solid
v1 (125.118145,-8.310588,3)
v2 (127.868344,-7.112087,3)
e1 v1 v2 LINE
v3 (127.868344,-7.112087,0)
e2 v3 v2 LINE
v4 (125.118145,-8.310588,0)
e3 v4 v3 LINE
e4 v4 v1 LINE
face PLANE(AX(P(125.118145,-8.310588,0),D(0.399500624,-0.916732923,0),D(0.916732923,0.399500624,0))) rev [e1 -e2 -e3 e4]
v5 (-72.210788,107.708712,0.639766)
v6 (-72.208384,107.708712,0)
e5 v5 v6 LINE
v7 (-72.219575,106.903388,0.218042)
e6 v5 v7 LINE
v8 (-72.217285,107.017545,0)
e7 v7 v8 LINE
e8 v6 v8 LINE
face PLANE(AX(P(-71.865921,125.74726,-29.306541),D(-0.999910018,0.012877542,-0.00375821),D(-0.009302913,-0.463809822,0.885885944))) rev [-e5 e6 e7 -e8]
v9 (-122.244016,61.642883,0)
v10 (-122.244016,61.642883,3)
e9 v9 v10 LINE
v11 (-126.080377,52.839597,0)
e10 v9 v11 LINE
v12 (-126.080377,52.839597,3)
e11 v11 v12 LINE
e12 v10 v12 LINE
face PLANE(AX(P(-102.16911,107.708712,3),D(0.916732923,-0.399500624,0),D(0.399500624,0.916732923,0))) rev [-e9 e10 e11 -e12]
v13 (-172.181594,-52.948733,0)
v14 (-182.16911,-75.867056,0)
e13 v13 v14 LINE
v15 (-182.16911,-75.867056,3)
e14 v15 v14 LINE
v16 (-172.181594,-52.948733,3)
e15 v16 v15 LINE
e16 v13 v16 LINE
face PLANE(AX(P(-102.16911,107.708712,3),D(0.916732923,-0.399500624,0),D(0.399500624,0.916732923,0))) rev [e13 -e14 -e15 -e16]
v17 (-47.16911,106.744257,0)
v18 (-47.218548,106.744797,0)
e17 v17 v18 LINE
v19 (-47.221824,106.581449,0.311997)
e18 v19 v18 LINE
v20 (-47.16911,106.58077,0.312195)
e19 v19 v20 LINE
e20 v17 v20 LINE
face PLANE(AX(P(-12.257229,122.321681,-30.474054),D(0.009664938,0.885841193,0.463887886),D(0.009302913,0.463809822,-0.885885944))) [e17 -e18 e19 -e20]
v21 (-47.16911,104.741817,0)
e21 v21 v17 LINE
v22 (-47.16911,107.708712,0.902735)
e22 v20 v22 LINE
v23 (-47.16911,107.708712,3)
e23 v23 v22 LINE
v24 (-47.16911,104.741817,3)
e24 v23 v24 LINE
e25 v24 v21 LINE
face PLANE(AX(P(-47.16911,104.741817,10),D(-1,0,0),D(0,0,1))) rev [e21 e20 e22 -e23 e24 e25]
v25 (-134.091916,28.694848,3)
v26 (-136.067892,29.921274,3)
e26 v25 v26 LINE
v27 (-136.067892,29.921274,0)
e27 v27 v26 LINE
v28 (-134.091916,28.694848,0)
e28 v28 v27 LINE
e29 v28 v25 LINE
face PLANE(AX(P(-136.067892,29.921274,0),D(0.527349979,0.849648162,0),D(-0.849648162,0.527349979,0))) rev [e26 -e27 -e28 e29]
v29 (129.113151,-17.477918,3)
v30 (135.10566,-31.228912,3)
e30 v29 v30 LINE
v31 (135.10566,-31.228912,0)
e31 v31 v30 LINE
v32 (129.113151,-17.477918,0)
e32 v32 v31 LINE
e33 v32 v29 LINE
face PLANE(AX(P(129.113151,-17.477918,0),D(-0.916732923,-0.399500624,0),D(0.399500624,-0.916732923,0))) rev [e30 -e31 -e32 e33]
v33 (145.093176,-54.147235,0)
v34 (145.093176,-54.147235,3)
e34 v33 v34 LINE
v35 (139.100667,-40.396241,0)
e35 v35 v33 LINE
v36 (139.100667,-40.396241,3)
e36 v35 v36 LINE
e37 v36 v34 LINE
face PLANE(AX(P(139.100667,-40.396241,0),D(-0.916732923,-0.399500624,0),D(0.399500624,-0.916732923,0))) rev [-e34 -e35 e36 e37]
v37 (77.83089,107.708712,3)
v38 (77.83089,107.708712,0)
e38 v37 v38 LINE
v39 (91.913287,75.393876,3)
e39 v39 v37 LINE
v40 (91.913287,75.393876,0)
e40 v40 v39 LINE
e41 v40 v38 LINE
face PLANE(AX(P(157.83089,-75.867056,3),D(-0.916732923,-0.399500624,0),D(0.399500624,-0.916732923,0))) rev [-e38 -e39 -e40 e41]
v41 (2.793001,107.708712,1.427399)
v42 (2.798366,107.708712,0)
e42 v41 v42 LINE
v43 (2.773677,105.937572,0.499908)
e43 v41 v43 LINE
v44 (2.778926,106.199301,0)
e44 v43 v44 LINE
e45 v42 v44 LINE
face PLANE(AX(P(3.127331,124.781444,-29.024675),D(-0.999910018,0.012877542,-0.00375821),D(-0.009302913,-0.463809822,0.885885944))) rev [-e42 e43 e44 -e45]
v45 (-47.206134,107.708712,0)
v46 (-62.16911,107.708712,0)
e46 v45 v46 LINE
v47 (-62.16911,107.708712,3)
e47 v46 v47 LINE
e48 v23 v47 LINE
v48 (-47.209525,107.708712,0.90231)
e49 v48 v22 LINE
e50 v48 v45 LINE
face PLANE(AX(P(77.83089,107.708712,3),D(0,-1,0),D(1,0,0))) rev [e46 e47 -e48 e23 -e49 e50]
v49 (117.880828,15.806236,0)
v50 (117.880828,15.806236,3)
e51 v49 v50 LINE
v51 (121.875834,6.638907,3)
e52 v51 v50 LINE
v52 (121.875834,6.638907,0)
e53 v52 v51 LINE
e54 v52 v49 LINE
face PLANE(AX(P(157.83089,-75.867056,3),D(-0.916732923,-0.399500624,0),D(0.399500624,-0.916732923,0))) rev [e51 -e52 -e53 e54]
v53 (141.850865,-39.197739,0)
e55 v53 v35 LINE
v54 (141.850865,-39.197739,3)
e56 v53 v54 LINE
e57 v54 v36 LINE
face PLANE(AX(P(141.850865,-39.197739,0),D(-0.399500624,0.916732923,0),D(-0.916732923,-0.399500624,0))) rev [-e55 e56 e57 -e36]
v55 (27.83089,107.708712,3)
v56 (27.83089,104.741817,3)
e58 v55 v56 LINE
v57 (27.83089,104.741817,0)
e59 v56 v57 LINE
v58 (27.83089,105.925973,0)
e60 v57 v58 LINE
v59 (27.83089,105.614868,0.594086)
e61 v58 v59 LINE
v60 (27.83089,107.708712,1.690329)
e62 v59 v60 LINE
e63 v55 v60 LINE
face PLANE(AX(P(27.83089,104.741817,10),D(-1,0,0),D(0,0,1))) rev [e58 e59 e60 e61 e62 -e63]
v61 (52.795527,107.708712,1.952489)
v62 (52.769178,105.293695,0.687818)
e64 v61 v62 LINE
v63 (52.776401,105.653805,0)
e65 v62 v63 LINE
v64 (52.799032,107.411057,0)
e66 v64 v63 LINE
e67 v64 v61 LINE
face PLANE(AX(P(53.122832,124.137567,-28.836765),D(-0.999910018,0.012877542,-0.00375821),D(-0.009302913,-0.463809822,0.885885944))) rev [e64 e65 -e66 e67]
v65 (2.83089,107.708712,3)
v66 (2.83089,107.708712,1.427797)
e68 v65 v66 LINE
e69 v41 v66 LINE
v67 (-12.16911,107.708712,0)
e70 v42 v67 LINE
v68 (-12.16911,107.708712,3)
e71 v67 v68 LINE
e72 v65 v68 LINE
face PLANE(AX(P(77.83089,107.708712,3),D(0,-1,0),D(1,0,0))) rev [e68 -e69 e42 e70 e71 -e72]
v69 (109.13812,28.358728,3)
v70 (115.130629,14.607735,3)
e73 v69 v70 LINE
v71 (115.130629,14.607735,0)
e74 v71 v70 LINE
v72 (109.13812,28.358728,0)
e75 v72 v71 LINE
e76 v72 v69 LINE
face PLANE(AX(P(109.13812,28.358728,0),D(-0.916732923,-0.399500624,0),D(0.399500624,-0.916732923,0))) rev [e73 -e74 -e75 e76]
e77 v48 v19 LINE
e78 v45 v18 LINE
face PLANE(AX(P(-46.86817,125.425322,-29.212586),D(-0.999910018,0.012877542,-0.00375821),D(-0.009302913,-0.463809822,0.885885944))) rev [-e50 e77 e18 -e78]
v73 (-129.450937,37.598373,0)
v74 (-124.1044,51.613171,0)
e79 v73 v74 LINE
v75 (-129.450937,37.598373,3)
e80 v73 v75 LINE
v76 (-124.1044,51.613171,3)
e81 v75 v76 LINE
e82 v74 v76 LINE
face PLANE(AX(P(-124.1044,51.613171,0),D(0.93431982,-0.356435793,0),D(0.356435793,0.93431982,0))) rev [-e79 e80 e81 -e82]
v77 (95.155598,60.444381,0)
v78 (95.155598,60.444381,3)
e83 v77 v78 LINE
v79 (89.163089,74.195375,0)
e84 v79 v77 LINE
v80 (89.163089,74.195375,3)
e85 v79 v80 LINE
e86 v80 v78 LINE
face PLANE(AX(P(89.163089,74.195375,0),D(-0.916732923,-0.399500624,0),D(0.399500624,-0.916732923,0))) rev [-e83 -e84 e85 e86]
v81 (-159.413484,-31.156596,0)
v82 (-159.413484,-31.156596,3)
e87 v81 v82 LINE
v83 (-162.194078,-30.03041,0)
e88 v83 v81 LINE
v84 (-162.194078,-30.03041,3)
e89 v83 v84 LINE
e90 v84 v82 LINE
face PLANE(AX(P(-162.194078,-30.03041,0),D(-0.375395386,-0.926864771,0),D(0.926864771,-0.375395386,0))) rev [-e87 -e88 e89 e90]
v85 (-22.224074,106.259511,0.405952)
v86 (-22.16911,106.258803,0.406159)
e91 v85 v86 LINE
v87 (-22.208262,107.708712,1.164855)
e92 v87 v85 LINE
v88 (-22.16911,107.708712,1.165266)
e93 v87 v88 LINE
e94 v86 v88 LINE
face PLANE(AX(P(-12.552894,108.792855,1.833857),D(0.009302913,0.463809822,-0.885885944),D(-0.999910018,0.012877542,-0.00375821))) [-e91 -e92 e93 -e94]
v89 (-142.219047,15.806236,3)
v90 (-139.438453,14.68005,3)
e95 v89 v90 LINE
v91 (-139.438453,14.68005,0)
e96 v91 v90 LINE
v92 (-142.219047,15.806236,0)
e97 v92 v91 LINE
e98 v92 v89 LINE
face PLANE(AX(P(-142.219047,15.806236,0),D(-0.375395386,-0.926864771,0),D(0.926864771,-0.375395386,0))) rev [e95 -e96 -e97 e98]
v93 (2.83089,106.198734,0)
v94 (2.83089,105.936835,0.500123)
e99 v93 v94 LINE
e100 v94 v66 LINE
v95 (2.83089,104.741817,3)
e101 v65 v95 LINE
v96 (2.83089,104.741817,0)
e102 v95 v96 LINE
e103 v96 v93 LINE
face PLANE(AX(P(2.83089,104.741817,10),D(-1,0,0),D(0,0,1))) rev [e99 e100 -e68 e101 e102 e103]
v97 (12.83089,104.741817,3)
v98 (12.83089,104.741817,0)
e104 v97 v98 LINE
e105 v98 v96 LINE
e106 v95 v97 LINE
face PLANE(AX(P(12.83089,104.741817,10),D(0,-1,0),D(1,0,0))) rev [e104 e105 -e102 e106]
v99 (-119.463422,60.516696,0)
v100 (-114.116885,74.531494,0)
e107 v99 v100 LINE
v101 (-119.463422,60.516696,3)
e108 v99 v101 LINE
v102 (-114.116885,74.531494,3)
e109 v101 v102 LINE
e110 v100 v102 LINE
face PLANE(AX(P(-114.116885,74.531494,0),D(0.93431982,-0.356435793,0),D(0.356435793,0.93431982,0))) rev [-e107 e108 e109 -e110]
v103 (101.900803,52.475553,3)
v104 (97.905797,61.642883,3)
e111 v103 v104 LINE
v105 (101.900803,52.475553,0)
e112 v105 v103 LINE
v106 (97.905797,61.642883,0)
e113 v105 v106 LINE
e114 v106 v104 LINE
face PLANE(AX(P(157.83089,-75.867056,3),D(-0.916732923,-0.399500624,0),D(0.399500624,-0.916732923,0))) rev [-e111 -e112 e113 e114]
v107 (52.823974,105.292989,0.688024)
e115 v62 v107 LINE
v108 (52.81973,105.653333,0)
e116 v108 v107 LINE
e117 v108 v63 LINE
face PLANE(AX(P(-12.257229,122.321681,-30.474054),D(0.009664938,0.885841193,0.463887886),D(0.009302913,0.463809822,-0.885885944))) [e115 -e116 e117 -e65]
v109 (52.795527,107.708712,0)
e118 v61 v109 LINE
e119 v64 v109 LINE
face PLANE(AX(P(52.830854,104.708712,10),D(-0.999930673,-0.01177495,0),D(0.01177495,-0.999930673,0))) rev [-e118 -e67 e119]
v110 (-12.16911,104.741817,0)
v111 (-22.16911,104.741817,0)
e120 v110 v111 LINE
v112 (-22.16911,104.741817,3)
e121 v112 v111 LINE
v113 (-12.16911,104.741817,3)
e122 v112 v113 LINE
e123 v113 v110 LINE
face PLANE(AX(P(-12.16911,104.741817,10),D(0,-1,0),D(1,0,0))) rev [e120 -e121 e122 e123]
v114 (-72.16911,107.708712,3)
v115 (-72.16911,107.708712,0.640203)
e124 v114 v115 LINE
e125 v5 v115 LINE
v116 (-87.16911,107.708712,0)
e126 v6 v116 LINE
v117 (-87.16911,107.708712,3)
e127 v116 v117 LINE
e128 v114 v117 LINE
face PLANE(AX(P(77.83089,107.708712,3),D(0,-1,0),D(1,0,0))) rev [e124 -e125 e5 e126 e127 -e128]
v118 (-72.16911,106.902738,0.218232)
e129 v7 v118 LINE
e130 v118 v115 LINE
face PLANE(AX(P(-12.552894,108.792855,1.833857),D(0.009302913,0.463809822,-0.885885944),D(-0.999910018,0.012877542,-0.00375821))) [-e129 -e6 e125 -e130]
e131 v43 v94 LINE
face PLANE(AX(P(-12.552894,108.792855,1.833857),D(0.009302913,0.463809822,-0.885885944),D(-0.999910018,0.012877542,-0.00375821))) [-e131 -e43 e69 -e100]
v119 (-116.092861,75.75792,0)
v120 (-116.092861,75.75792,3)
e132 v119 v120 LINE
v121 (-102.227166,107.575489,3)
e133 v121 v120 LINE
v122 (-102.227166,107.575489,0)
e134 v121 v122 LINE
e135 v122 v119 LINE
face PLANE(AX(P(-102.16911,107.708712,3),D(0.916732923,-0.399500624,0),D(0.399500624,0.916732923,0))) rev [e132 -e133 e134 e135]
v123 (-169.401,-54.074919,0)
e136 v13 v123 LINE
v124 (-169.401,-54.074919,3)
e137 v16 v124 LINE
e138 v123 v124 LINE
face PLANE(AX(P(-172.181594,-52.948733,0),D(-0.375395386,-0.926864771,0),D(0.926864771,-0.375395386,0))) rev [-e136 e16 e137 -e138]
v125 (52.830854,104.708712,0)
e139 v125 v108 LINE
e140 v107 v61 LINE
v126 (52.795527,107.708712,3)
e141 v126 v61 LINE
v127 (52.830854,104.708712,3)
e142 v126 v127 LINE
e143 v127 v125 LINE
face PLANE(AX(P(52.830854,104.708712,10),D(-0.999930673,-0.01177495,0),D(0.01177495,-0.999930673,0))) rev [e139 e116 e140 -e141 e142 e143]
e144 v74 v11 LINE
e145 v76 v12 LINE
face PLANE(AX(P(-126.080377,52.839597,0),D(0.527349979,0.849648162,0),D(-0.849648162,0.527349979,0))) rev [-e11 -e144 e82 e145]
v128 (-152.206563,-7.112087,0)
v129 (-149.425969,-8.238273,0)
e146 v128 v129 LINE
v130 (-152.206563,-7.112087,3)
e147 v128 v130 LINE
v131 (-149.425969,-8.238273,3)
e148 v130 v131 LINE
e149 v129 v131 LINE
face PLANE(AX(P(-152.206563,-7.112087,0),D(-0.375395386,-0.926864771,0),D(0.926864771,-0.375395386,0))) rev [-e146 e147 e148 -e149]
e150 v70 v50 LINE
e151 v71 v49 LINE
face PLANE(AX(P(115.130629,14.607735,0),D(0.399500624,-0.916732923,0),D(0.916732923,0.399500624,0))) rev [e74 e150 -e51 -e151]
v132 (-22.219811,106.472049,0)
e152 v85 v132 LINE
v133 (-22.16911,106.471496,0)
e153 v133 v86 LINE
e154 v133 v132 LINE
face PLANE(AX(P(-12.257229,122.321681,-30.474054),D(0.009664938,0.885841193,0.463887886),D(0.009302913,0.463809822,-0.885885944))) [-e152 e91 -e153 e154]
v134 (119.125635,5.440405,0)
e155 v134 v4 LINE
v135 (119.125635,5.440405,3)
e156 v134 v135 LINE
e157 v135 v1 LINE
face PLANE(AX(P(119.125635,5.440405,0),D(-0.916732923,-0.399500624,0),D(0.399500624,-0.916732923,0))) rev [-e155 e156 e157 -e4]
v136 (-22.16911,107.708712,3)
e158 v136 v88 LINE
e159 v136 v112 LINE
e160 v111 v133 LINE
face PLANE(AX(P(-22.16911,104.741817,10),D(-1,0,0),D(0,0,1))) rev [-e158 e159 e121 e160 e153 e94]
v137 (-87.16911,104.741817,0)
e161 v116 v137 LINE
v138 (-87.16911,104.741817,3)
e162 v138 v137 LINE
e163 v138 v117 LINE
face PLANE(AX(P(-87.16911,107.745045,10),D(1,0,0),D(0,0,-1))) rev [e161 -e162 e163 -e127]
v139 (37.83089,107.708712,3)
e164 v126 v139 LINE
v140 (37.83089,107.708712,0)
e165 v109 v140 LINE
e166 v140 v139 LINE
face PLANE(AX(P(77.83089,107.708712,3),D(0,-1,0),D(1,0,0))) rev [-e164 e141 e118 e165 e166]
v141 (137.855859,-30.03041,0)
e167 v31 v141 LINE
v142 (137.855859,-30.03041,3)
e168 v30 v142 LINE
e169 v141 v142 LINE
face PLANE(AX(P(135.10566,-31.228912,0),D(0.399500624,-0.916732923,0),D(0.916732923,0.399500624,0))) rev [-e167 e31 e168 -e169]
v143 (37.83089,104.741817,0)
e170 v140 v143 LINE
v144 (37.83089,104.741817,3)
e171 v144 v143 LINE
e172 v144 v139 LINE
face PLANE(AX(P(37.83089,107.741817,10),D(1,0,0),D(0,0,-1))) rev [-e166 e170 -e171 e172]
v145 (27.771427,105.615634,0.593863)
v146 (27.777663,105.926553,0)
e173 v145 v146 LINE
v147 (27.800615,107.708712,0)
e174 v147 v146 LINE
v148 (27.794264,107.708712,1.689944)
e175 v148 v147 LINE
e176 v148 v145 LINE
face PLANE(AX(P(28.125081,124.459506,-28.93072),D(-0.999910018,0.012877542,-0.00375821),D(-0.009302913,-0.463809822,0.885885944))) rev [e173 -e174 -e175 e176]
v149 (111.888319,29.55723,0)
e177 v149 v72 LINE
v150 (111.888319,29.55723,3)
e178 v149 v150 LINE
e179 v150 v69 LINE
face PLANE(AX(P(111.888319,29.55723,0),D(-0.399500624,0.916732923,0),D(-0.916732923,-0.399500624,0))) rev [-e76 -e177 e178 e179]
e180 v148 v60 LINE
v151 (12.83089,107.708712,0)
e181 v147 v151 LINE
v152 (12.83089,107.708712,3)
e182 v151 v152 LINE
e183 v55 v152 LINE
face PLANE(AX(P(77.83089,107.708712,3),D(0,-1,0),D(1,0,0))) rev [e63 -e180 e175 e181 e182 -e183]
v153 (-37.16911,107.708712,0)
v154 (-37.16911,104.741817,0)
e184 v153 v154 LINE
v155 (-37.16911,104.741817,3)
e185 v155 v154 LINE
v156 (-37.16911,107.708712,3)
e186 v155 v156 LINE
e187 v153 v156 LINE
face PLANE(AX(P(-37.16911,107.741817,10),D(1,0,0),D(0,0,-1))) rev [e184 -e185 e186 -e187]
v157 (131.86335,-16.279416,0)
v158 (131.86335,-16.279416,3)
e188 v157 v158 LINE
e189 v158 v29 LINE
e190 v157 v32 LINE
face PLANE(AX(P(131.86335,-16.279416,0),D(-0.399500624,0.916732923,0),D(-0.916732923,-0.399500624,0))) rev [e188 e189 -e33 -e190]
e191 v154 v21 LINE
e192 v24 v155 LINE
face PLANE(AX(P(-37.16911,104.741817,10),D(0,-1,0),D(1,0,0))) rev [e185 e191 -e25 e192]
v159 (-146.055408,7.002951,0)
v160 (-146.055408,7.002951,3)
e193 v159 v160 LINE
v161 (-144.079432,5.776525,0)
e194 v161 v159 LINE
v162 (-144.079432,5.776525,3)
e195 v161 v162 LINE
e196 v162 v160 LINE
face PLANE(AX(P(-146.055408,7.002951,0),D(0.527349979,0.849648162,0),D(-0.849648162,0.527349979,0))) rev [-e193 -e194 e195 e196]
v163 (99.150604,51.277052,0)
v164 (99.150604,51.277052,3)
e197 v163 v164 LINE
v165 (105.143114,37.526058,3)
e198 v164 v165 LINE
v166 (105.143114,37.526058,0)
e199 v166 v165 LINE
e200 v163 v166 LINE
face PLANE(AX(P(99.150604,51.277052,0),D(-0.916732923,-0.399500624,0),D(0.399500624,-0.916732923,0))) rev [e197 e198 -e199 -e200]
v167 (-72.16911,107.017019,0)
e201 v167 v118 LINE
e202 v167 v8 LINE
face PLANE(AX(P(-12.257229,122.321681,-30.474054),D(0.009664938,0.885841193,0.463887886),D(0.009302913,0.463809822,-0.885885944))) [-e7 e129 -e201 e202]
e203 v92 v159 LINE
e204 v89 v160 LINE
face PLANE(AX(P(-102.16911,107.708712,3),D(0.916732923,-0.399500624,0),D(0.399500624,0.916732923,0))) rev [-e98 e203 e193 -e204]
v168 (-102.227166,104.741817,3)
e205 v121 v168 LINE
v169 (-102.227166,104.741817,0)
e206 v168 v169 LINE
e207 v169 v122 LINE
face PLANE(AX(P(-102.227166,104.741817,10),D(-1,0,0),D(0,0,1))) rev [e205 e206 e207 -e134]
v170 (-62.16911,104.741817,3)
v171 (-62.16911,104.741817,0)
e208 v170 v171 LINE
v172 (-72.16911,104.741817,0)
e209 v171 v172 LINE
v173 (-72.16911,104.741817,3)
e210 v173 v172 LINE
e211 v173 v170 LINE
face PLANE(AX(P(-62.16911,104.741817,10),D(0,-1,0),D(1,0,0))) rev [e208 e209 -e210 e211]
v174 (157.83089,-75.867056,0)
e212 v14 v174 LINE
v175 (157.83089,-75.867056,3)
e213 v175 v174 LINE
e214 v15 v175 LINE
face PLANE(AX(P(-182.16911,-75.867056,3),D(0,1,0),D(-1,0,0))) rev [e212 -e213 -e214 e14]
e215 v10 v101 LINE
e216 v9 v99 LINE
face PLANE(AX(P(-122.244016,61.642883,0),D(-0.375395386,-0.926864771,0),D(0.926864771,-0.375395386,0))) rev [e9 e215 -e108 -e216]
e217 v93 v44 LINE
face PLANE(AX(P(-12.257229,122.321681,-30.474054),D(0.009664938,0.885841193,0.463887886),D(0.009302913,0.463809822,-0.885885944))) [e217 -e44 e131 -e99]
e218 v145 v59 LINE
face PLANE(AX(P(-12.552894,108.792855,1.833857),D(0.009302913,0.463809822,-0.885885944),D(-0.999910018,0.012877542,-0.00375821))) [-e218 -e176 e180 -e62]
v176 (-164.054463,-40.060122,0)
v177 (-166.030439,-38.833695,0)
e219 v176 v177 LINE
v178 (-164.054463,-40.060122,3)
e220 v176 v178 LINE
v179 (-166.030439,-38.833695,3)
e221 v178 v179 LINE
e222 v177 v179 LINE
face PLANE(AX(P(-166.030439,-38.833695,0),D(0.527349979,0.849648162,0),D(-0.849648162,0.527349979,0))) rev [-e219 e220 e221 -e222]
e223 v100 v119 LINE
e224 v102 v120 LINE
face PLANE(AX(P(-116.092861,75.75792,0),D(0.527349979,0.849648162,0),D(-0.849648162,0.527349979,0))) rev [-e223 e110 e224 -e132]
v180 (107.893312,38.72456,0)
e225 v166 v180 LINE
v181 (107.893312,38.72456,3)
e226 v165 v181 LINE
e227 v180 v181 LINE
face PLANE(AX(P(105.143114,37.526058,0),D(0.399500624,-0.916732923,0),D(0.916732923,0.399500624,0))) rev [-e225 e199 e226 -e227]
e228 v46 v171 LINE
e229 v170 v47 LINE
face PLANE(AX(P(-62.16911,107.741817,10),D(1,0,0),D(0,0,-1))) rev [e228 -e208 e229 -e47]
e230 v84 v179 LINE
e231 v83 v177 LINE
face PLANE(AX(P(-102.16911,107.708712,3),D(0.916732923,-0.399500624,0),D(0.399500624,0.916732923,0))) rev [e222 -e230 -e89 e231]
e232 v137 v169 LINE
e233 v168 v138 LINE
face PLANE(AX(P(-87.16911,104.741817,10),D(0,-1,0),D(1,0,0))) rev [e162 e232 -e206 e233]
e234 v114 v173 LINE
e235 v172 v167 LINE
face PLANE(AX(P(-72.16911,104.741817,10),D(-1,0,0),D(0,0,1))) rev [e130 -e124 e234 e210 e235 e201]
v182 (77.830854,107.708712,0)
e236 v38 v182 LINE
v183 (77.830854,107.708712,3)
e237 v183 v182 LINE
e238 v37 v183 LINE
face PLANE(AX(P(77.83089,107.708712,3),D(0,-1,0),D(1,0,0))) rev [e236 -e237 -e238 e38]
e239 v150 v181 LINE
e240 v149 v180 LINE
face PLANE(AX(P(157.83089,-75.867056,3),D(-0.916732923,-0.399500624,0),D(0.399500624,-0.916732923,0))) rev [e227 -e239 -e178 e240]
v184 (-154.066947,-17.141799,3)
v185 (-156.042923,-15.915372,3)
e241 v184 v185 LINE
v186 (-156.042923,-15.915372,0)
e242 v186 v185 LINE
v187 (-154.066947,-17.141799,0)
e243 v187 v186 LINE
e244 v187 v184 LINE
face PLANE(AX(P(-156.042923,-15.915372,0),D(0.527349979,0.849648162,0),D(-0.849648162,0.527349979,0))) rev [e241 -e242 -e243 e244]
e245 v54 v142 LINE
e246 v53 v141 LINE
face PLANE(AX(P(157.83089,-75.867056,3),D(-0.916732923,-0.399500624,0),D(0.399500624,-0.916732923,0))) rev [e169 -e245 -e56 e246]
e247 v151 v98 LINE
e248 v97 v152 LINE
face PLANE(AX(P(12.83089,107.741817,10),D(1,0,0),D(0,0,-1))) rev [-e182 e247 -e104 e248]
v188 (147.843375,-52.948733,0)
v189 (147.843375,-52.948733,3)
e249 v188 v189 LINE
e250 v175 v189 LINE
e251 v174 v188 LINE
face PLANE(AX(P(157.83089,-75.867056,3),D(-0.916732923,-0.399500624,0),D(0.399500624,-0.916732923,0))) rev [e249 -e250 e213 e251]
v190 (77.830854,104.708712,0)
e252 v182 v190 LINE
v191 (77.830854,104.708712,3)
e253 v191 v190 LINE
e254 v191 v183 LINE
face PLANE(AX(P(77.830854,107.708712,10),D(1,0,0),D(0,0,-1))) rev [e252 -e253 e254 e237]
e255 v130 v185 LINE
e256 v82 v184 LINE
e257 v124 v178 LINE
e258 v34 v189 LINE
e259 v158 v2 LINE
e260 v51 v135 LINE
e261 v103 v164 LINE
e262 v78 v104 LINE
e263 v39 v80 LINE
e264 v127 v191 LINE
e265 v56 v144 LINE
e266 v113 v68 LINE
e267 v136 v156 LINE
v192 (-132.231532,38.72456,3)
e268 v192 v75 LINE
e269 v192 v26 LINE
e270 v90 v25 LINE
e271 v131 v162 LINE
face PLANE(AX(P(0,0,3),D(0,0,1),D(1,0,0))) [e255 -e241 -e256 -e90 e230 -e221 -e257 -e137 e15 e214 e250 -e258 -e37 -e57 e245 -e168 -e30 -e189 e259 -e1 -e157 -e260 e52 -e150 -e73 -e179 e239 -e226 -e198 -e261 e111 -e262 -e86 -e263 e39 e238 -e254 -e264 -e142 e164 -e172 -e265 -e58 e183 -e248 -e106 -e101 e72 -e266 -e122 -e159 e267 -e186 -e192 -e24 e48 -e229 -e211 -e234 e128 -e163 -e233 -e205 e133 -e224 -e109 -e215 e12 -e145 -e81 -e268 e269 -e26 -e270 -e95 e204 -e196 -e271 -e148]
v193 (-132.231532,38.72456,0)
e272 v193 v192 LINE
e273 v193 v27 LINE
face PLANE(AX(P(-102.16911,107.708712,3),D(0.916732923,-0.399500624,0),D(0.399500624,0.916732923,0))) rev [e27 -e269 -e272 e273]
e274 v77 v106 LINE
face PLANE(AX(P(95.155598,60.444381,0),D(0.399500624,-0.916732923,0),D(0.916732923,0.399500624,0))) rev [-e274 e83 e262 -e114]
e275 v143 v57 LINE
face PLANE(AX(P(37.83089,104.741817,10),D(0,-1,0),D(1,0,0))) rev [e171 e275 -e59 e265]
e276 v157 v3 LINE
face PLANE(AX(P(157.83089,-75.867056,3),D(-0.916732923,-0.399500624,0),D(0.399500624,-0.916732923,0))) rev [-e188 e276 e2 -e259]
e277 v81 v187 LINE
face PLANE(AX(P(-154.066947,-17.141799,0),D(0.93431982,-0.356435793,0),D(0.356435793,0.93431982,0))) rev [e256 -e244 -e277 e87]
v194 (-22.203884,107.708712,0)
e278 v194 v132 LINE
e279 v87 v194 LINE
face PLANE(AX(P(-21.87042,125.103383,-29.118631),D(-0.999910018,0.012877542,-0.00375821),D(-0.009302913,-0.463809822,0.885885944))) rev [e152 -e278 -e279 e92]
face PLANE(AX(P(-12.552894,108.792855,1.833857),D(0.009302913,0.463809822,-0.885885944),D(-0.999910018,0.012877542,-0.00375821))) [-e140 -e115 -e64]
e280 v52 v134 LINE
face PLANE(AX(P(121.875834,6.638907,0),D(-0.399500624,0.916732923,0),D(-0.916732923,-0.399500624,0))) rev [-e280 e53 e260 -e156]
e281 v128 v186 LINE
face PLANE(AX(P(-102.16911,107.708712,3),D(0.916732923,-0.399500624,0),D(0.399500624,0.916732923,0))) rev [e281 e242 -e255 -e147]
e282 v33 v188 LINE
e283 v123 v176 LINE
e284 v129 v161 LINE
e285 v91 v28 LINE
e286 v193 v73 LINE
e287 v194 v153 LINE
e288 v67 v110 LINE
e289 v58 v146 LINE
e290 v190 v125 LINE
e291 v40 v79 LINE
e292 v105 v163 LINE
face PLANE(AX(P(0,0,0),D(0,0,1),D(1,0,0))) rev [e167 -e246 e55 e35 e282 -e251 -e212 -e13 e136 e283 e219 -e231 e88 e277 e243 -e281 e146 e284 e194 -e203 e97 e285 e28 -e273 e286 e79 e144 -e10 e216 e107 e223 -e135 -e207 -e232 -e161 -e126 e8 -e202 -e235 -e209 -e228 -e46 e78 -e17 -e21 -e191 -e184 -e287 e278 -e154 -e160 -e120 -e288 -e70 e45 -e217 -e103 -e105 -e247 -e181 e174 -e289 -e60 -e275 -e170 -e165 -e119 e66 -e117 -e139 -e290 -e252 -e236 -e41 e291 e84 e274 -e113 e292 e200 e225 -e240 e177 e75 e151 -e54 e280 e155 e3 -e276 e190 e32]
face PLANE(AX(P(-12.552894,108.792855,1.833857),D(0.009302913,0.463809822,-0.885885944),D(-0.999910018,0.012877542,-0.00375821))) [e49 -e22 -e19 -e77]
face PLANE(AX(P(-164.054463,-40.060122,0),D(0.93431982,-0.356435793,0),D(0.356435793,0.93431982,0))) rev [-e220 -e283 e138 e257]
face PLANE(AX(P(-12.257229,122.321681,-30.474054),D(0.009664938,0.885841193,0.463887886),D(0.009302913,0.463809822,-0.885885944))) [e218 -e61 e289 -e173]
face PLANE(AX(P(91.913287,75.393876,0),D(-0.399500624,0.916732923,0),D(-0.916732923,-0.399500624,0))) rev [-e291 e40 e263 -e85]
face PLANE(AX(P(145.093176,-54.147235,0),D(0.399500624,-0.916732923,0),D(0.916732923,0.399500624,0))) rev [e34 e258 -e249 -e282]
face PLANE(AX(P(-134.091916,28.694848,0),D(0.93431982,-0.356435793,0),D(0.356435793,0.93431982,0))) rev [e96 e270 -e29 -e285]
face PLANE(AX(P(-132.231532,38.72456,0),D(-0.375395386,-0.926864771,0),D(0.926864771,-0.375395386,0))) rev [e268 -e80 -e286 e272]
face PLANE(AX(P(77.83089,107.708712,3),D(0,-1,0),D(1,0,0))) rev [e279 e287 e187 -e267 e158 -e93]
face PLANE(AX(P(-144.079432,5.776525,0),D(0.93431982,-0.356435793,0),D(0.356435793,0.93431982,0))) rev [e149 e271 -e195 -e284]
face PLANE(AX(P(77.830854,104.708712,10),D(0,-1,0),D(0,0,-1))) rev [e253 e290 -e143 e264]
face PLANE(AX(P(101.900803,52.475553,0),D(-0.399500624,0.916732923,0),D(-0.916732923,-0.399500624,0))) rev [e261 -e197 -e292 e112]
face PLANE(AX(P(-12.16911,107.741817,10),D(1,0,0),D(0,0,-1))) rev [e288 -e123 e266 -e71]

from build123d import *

# Parameters (mm, degrees)
BOSS_EXTRUDE1_DEPTH = 3
CUT_EXTRUDE2_DEPTH  = 3
LPATTERN2_COUNT     = 6
LPATTERN2_PITCH     = 25
CUT_EXTRUDE3_DEPTH  = 3
LPATTERN3_COUNT     = 6
LPATTERN3_PITCH     = 25
CAVITY4_START       = 94.102573719
CAVITY4_DEPTH       = 3
SKETCH4_W           = 10
SKETCH4_H           = 3
SKETCH4_W_2         = 15.058056796
SKETCH4_H_2         = 3.003228899
CUT_EXTRUDE5_DEPTH  = 10


# Read off the part's stored shape, not the designer's step: Cavity4
with BuildPart() as part:
    # Sketch1 → Boss-Extrude1 (new body)
    with BuildSketch(Plane.XY):
        Polygon((-182.169109633, -75.86705578), (157.830890367, -75.86705578), (77.830890367, 107.708711956), (-102.169109633, 107.708711956), align=None)
    extrude(amount=BOSS_EXTRUDE1_DEPTH)

    # Sketch2 → Cut-Extrude2 (cut)
    with BuildSketch(Plane.XY.offset(3)):
        Polygon((-172.181594028, -52.948732717), (-169.400999714, -54.074918874), (-164.054462817, -40.06012158), (-166.030438991, -38.833695112), align=None)
    cut_extrude2 = extrude(amount=-CUT_EXTRUDE2_DEPTH, mode=Mode.SUBTRACT)

    # LPattern2: Cut-Extrude2 ×6
    with Locations(*[Vector(0.3995006242197252, 0.916732922528721, 0) * (i * LPATTERN2_PITCH) for i in range(1, LPATTERN2_COUNT)]):
        add(cut_extrude2, mode=Mode.SUBTRACT)

    # Sketch3 → Cut-Extrude3 (cut)
    with BuildSketch(Plane.XY.offset(3)):
        Polygon((147.843374761, -52.948732717), (141.850865398, -39.197738879), (139.10066663, -40.396240752), (145.093175994, -54.14723459), align=None)
    cut_extrude3 = extrude(amount=-CUT_EXTRUDE3_DEPTH, mode=Mode.SUBTRACT)

    # LPattern3: Cut-Extrude3 ×6
    with Locations(*[Vector(-0.3995006242197251, 0.9167329225287211, 0) * (i * LPATTERN3_PITCH) for i in range(1, LPATTERN3_COUNT)]):
        add(cut_extrude3, mode=Mode.SUBTRACT)

    # Cavity4 outline → Cavity4 (cut)
    with BuildSketch(Plane(origin=(0, 0, 0), x_dir=(0.9999532933915303, -0.008562000513036364, -0.004483657284732639), z_dir=(0.009664938459823271, 0.8858411925353571, 0.46388788577856205)).offset(CAVITY4_START)):
        Polygon((-103.131187753, 49.679443772), (-88.131836909, 49.53989356), (-88.127862283, 49.967100463), (-88.118252444, 51), (-103.118901627, 51), (-103.12893984, 49.921057402), align=None)
        Polygon((-63.117170469, 51), (-73.117603258, 51), (-73.127213098, 49.967100463), (-73.132486065, 49.400343349), (-63.132918836, 49.307309875), (-63.126780309, 49.967100463), align=None)
        Polygon((-38.116088496, 51), (-48.116521286, 51), (-48.126131125, 49.967100463), (-48.133567992, 49.167759664), (-38.134000762, 49.07472619), (-38.125698335, 49.967100463), align=None)
        Polygon((-13.115006523, 51), (-23.115439311, 51), (-23.125049151, 49.967100463), (-23.134649919, 48.935175979), (-13.135082689, 48.842142504), (-13.124616362, 49.967100463), align=None)
        Polygon((76.879278743, 49.967100463), (76.888888582, 51), (51.887806609, 51), (51.87819677, 49.967100463), (51.862104301, 48.237424923), (76.861022374, 48.004841237), align=None)
        Polygon((11.886075451, 51), (1.885642662, 51), (1.876032823, 49.967100463), (1.864268155, 48.702592293), (11.863835384, 48.609558819), (11.876465612, 49.967100463), align=None)
        Polygon((36.877547586, 49.967100463), (36.887157425, 51), (26.886724635, 51), (26.877114796, 49.967100463), (26.863186228, 48.470008608), (36.862753457, 48.376975134), align=None)
    extrude(amount=CAVITY4_DEPTH, mode=Mode.SUBTRACT)

    # Sketch4 → Cut-Extrude5 (cut)
    with BuildSketch(Plane(origin=(0, 0, 0), x_dir=(-1, 0, 0), z_dir=(0, 0, -1))):
        Polygon((-77.830853836, 107.708711956), (-77.830853836, 104.708711956), (-52.830853836, 104.708711956), (-52.795526537, 107.708711956), align=None)
        with Locations((-32.830890367, 106.241816524)):
            Rectangle(SKETCH4_W, SKETCH4_H)
        with Locations((-7.830890367, 106.241816524)):
            Rectangle(SKETCH4_W, SKETCH4_H)
        with Locations((17.169109633, 106.241816524)):
            Rectangle(SKETCH4_W, SKETCH4_H)
        with Locations((42.169109633, 106.241816524)):
            Rectangle(SKETCH4_W, SKETCH4_H)
        with Locations((67.169109633, 106.241816524)):
            Rectangle(SKETCH4_W, SKETCH4_H)
        with Locations((94.698138031, 106.243430974)):
            Rectangle(SKETCH4_W_2, SKETCH4_H_2)
    extrude(amount=-CUT_EXTRUDE5_DEPTH, mode=Mode.SUBTRACT)


solid = part.part
